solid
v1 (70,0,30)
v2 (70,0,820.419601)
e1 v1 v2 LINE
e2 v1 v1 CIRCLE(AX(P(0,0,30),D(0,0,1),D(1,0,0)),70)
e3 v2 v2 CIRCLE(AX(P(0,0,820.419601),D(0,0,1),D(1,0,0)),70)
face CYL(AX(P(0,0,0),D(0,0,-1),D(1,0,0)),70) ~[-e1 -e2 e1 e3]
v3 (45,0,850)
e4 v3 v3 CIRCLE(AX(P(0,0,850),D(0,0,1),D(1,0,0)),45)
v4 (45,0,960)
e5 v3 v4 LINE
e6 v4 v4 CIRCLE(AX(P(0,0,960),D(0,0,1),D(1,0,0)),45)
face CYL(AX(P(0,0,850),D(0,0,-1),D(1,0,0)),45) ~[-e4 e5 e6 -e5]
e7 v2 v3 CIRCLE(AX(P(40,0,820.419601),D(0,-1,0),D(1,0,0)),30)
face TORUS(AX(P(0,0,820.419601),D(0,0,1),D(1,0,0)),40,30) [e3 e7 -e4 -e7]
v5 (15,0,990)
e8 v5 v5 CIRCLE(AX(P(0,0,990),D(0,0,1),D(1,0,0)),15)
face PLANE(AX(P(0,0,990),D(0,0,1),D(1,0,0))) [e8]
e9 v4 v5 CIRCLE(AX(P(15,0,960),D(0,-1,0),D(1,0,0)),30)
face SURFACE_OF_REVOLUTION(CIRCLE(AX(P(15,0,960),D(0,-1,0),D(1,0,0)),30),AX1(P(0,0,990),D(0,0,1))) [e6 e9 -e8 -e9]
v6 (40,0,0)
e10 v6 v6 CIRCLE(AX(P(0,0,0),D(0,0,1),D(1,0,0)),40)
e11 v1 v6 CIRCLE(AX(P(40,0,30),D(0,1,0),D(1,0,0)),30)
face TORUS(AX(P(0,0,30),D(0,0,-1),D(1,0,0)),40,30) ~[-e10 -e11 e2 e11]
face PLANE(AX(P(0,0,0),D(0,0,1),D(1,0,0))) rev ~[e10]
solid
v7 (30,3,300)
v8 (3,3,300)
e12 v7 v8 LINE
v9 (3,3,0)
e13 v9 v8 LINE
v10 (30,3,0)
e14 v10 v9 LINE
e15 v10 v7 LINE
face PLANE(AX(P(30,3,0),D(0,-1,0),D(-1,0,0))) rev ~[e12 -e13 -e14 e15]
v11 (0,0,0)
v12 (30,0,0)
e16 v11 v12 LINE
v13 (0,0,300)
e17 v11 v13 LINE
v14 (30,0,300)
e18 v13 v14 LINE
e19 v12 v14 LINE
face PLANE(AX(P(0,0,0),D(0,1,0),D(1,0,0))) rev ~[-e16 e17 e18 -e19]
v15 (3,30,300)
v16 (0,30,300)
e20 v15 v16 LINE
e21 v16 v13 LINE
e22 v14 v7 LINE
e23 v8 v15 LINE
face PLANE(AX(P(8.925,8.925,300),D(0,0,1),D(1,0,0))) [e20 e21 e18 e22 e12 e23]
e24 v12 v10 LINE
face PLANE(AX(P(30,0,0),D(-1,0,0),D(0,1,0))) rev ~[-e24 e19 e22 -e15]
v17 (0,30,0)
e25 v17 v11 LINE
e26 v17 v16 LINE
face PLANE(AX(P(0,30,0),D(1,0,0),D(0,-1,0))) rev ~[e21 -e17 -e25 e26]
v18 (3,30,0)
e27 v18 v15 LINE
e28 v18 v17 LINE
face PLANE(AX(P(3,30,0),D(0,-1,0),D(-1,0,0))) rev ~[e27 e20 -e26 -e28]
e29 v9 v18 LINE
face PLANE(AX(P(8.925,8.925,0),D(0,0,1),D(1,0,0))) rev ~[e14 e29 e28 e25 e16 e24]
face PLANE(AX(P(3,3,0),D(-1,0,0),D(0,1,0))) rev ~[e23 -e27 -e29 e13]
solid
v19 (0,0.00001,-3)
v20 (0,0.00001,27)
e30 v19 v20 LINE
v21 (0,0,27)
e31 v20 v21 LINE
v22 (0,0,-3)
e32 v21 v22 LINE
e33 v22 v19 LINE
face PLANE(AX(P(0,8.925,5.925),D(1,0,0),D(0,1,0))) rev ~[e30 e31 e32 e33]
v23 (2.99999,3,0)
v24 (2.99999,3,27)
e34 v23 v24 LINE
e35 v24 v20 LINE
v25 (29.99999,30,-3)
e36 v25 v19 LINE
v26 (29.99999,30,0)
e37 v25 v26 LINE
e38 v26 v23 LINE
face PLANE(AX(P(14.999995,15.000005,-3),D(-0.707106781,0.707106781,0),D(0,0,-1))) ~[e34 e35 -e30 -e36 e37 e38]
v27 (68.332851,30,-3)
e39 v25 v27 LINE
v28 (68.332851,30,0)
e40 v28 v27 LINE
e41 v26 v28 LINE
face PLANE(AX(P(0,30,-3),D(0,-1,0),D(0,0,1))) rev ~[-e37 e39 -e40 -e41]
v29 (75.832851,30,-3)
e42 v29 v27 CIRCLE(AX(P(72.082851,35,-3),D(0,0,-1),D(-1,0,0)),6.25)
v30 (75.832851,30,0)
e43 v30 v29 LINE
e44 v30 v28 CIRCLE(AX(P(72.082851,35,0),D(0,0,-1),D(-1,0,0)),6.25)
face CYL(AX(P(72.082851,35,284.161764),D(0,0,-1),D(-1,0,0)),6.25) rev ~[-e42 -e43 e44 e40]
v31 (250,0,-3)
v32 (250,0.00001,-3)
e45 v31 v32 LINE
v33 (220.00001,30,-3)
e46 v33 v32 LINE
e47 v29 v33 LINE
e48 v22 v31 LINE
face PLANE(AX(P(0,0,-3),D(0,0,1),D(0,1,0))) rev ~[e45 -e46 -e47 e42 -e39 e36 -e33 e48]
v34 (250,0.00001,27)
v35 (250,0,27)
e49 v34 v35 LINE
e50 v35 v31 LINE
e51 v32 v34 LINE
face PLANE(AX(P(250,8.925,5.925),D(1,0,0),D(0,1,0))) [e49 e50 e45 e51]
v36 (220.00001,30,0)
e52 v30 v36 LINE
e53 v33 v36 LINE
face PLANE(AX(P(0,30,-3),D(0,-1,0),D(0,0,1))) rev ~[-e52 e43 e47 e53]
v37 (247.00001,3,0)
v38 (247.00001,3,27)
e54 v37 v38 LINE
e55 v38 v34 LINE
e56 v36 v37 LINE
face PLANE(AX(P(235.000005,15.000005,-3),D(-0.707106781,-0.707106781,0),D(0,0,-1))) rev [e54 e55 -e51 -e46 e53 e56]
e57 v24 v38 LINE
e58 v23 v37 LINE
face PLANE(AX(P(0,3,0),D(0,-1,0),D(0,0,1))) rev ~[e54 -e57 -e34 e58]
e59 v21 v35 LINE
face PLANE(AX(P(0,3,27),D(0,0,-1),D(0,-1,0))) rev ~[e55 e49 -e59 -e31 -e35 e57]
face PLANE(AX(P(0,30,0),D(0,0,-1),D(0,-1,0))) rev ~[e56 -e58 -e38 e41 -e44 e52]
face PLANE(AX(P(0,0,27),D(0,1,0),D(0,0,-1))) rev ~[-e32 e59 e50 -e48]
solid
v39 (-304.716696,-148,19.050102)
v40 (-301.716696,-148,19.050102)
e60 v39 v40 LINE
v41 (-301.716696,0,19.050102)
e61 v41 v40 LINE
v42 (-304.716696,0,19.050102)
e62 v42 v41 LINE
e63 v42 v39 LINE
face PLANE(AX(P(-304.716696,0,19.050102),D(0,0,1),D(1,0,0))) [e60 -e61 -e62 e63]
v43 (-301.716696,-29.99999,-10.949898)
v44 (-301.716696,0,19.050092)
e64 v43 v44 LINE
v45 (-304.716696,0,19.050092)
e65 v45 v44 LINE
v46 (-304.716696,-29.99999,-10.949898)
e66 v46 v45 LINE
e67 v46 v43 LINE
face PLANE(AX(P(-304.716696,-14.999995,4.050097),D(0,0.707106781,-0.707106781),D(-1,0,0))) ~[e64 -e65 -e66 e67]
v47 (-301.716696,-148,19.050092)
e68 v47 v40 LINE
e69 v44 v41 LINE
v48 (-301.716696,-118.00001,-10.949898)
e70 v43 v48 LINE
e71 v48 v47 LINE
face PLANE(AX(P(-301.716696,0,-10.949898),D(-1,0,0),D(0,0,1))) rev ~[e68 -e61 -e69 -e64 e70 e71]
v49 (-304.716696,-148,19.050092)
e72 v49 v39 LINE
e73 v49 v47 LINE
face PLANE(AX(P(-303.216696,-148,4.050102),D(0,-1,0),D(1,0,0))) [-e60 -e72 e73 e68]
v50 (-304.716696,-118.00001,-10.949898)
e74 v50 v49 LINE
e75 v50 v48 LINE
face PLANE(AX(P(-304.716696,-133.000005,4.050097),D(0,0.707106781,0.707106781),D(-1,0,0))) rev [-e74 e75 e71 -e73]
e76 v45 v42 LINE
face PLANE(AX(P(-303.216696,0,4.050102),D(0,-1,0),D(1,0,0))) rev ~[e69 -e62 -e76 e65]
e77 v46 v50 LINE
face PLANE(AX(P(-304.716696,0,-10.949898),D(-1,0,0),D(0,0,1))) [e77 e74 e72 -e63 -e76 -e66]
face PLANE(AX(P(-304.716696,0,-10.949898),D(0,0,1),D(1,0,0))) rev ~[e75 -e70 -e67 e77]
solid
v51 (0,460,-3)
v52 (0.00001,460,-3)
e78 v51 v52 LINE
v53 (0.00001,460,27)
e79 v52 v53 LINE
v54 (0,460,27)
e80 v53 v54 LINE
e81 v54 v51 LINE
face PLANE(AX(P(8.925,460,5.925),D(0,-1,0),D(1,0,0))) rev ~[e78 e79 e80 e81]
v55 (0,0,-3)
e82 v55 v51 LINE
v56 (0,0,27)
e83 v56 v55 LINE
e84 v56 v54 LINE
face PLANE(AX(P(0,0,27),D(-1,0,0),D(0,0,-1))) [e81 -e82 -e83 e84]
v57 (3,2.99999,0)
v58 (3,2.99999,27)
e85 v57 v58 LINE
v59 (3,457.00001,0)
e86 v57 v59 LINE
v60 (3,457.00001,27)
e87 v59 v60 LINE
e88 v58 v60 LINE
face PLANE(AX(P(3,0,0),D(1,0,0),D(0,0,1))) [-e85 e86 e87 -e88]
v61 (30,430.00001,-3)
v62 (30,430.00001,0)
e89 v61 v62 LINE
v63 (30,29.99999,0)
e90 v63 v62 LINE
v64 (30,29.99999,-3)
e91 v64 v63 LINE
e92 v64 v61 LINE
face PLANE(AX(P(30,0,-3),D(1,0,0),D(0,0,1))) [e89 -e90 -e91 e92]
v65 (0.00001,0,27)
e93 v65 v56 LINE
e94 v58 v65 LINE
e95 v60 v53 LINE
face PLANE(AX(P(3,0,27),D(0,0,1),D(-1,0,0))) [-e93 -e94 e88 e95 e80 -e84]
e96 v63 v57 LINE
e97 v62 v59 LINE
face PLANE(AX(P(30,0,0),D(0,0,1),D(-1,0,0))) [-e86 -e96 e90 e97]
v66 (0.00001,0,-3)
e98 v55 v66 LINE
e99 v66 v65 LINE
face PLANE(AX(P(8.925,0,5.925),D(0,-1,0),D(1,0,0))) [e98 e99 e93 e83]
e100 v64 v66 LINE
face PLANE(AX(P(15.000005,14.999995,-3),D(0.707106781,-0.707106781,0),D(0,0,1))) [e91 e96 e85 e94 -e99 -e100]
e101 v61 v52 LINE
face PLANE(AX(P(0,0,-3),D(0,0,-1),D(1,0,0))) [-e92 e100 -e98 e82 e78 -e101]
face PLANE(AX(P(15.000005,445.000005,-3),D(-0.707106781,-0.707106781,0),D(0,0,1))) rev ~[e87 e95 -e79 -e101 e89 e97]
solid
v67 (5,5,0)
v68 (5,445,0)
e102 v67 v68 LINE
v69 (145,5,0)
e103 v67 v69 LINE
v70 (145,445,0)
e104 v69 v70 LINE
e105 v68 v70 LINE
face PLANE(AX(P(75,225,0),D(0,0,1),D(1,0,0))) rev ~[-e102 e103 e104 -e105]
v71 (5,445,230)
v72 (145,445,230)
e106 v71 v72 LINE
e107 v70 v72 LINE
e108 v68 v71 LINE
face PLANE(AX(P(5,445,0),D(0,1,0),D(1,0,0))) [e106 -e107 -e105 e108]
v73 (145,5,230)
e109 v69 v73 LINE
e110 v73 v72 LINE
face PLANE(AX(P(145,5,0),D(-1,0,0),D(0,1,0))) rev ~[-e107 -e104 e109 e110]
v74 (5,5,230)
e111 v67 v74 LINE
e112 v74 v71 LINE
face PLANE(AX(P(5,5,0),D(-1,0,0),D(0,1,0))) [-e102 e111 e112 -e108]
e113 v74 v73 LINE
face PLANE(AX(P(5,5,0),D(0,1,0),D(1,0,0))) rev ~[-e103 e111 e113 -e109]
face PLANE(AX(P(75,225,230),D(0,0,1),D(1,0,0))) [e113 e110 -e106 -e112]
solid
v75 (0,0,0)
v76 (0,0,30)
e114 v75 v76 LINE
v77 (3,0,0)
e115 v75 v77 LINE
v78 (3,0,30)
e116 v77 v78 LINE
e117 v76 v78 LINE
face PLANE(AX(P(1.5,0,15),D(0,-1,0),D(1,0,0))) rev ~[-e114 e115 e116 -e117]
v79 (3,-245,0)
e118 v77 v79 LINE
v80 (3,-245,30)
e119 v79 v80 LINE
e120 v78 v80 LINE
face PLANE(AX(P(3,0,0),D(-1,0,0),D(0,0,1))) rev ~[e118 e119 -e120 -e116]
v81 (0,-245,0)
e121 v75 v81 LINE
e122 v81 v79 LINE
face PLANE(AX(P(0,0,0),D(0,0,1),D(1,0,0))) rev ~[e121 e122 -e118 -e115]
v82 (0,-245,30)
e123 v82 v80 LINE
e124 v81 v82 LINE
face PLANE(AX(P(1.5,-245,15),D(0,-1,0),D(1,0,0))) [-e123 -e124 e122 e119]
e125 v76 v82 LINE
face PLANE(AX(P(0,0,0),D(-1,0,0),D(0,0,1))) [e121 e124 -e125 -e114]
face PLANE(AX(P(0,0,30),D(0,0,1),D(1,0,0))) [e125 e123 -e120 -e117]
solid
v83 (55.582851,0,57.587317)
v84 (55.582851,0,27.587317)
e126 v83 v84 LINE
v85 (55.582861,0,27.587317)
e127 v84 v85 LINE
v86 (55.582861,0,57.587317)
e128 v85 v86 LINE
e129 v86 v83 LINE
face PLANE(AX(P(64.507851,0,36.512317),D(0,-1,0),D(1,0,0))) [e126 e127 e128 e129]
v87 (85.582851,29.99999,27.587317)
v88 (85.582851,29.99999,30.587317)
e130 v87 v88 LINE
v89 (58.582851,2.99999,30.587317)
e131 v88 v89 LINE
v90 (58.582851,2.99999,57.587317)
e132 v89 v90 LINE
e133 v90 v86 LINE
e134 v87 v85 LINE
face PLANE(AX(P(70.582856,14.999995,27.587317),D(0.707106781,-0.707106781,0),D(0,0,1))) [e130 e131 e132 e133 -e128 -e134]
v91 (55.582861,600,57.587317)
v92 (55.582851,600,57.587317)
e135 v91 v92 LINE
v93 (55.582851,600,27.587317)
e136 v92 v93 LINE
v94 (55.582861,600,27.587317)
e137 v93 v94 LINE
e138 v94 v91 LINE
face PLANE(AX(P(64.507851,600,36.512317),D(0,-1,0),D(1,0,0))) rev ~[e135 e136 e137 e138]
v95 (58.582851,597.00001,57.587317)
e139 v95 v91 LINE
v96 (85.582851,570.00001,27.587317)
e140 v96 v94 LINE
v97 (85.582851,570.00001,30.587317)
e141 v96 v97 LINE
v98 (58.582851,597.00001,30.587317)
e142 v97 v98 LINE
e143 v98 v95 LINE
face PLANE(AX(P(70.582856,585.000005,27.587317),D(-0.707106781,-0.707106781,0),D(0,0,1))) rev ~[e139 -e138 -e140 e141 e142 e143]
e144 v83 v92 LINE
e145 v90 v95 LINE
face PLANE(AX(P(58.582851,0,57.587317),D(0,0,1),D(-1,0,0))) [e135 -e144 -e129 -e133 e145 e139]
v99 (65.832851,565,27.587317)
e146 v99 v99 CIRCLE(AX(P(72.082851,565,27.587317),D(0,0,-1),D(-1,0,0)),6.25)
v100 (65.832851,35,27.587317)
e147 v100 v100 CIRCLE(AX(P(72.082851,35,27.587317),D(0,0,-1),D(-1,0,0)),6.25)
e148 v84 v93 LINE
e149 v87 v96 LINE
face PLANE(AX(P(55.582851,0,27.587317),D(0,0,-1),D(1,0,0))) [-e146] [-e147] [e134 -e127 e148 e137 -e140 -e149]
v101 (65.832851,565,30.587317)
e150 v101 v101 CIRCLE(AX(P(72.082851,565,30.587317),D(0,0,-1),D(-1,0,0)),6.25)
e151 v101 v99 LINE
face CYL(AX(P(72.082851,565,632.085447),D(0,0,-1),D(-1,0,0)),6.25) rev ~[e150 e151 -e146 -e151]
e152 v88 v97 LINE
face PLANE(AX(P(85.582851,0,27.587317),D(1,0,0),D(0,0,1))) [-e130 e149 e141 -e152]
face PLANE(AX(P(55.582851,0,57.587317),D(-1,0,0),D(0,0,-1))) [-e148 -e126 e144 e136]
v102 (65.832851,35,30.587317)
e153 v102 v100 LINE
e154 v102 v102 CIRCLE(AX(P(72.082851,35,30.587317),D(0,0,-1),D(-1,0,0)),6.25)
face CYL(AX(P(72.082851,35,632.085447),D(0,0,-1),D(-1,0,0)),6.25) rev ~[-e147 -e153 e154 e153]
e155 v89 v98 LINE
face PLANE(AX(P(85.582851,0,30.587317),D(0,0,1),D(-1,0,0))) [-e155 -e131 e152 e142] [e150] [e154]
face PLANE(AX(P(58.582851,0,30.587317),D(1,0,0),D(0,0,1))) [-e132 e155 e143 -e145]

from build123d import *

# Parameters (mm, degrees)
F0_W      = 140
F0_H      = 440
F1_DEPTH  = 230
F3_DEPTH  = 460
F4_SIZE   = 29.99999
F6_DEPTH  = 250
F7_SIZE   = 29.99999
F9_DEPTH  = 300
F11_DEPTH = 600
F12_SIZE  = 29.99999
F13_W     = 3
F13_H     = 30
F14_DEPTH = 245
F15_W     = 3
F15_H     = 30
F16_DEPTH = 148
F17_SIZE  = 29.99999
F19_D     = 12.5
F19_2_D   = 12.5
F20_R     = 70
F21_DEPTH = 850
F22_R     = 45
F23_DEPTH = 140


# Not quite as in the source:
# - a fillet or chamfer that OpenCascade refuses, or shapes differently, is made with other operations: its cross-section is extruded or revolved along the edge and cut away or added
# - a fillet or chamfer is up to 0.001 mm smaller than in the source, because OpenCascade refuses the exact size


with BuildPart() as f1:
    # F0 (on Top) → F1 (new body)
    with BuildSketch(Plane.XY):
        with Locations((75, 225)):
            Rectangle(F0_W, F0_H)
    extrude(amount=F1_DEPTH)


with BuildPart() as f3:
    # F2 (on Front) → F3 (new body)
    with BuildSketch(Plane.XZ):
        Polygon((3, 0), (3, 27), (0, 27), (0, -3), (30, -3), (30, 0), align=None)
    extrude(amount=-F3_DEPTH)

    # F4 (size 30 in the source; OpenCascade refuses exactly that, so slightly less here)
    f4_edges = [f3.edges().sort_by_distance(p)[0] for p in [
        (30, 460, -1.5),
        (30, 0, -1.5),
    ]]
    chamfer(f4_edges, length=F4_SIZE)


with BuildPart() as f6:
    # F5 (on Right) → F6 (new body)
    with BuildSketch(Plane.YZ):
        Polygon((3, 27), (0, 27), (0, -3), (30, -3), (30, 0), (3, 0), align=None)
    extrude(amount=F6_DEPTH)

    # F7 (size 30 in the source; OpenCascade refuses exactly that, so slightly less here)
    f7_edges = [f6.edges().sort_by_distance(p)[0] for p in [
        (0, 30, -1.5),
        (250, 30, -1.5),
    ]]
    chamfer(f7_edges, length=F7_SIZE)

    # F19 (through all)
    with Locations(Plane.XY.offset(30.5873168707)):
        with Locations((72.0828511119, 35), (72.0828511119, 565)):
            Hole(F19_D / 2)


with BuildPart() as f9:
    # F8 (on Top) → F9 (new body)
    with BuildSketch(Plane.XY):
        Polygon((0, 30), (0, 0), (30, 0), (30, 3), (3, 3), (3, 30), align=None)
    extrude(amount=F9_DEPTH)


with BuildPart() as f11:
    # F10 (on Front) → F11 (new body)
    with BuildSketch(Plane.XZ):
        Polygon((58.5828511119, 30.5873168707), (58.5828511119, 57.5873168707), (55.5828511119, 57.5873168707), (55.5828511119, 27.5873168707), (85.5828511119, 27.5873168707), (85.5828511119, 30.5873168707), align=None)
    extrude(amount=-F11_DEPTH)

    # F12 (size 30 in the source; OpenCascade refuses exactly that, so slightly less here)
    f12_edges = [f11.edges().sort_by_distance(p)[0] for p in [
        (85.582851, 0, 29.087317),
        (85.582851, 600, 29.087317),
    ]]
    chamfer(f12_edges, length=F12_SIZE)

    # F19#2 (through all)
    with Locations(Plane.XY.offset(30.5873168707)):
        with Locations((72.0828511119, 35), (72.0828511119, 565)):
            Hole(F19_2_D / 2)


with BuildPart() as f14:
    # F13 (on Front) → F14 (new body)
    with BuildSketch(Plane.XZ):
        with Locations((1.5, 15)):
            Rectangle(F13_W, F13_H)
    extrude(amount=F14_DEPTH)


with BuildPart() as f16:
    # F15 (on Front) → F16 (new body)
    with BuildSketch(Plane.XZ):
        with Locations((-303.2166957855, 4.0501020849)):
            Rectangle(F15_W, F15_H)
    extrude(amount=F16_DEPTH)

    # F17 (size 30 in the source; OpenCascade refuses exactly that, so slightly less here)
    f17_edges = [f16.edges().sort_by_distance(p)[0] for p in [
        (-303.216696, 0, -10.949898),
        (-303.216696, -148, -10.949898),
    ]]
    chamfer(f17_edges, length=F17_SIZE)


with BuildPart() as f21:
    # F20 (on Top) → F21 (new body)
    with BuildSketch(Plane.XY):
        Circle(F20_R)
    extrude(amount=F21_DEPTH)

    # F22 (on face) → F23 (join)
    with BuildSketch(Plane.XY.offset(850)):
        Circle(F22_R)
    extrude(amount=F23_DEPTH)

    # F24: fillet of radius 30 on 3 edges, made by hand

    # F24_s1 → F24_t2 (revolve, cut)
    with BuildSketch(Plane.XZ):
        with BuildLine():
            ThreePointArc((70, 30), (61.2132034356, 8.7867965644), (40, 0))
            Line((40, 0), (70, 0))
            Line((70, 0), (70, 30))
        make_face()
    revolve(axis=Axis((0, 0, 0), (0, 0, 1)), mode=Mode.SUBTRACT)

    # F24_s3 → F24_t4 (revolve, cut)
    with BuildSketch(Plane.XZ):
        with BuildLine():
            ThreePointArc((70, 820.4196010845), (62.9128784748, 839.7845178155), (45, 850))
            Line((45, 850), (70, 850))
            Line((70, 850), (70, 820.4196010845))
        make_face()
    revolve(axis=Axis((0, 0, 850), (0, 0, 1)), mode=Mode.SUBTRACT)

    # F24_s5 → F24_t6 (revolve, cut)
    with BuildSketch(Plane.XZ):
        with BuildLine():
            ThreePointArc((45, 960), (36.2132034356, 981.2132034356), (15, 990))
            Line((15, 990), (45, 990))
            Line((45, 990), (45, 960))
        make_face()
    revolve(axis=Axis((0, 0, 990), (0, 0, 1)), mode=Mode.SUBTRACT)


solid = Compound([f1.part, f3.part, f6.part, f9.part, f11.part, f14.part, f16.part, f21.part])
